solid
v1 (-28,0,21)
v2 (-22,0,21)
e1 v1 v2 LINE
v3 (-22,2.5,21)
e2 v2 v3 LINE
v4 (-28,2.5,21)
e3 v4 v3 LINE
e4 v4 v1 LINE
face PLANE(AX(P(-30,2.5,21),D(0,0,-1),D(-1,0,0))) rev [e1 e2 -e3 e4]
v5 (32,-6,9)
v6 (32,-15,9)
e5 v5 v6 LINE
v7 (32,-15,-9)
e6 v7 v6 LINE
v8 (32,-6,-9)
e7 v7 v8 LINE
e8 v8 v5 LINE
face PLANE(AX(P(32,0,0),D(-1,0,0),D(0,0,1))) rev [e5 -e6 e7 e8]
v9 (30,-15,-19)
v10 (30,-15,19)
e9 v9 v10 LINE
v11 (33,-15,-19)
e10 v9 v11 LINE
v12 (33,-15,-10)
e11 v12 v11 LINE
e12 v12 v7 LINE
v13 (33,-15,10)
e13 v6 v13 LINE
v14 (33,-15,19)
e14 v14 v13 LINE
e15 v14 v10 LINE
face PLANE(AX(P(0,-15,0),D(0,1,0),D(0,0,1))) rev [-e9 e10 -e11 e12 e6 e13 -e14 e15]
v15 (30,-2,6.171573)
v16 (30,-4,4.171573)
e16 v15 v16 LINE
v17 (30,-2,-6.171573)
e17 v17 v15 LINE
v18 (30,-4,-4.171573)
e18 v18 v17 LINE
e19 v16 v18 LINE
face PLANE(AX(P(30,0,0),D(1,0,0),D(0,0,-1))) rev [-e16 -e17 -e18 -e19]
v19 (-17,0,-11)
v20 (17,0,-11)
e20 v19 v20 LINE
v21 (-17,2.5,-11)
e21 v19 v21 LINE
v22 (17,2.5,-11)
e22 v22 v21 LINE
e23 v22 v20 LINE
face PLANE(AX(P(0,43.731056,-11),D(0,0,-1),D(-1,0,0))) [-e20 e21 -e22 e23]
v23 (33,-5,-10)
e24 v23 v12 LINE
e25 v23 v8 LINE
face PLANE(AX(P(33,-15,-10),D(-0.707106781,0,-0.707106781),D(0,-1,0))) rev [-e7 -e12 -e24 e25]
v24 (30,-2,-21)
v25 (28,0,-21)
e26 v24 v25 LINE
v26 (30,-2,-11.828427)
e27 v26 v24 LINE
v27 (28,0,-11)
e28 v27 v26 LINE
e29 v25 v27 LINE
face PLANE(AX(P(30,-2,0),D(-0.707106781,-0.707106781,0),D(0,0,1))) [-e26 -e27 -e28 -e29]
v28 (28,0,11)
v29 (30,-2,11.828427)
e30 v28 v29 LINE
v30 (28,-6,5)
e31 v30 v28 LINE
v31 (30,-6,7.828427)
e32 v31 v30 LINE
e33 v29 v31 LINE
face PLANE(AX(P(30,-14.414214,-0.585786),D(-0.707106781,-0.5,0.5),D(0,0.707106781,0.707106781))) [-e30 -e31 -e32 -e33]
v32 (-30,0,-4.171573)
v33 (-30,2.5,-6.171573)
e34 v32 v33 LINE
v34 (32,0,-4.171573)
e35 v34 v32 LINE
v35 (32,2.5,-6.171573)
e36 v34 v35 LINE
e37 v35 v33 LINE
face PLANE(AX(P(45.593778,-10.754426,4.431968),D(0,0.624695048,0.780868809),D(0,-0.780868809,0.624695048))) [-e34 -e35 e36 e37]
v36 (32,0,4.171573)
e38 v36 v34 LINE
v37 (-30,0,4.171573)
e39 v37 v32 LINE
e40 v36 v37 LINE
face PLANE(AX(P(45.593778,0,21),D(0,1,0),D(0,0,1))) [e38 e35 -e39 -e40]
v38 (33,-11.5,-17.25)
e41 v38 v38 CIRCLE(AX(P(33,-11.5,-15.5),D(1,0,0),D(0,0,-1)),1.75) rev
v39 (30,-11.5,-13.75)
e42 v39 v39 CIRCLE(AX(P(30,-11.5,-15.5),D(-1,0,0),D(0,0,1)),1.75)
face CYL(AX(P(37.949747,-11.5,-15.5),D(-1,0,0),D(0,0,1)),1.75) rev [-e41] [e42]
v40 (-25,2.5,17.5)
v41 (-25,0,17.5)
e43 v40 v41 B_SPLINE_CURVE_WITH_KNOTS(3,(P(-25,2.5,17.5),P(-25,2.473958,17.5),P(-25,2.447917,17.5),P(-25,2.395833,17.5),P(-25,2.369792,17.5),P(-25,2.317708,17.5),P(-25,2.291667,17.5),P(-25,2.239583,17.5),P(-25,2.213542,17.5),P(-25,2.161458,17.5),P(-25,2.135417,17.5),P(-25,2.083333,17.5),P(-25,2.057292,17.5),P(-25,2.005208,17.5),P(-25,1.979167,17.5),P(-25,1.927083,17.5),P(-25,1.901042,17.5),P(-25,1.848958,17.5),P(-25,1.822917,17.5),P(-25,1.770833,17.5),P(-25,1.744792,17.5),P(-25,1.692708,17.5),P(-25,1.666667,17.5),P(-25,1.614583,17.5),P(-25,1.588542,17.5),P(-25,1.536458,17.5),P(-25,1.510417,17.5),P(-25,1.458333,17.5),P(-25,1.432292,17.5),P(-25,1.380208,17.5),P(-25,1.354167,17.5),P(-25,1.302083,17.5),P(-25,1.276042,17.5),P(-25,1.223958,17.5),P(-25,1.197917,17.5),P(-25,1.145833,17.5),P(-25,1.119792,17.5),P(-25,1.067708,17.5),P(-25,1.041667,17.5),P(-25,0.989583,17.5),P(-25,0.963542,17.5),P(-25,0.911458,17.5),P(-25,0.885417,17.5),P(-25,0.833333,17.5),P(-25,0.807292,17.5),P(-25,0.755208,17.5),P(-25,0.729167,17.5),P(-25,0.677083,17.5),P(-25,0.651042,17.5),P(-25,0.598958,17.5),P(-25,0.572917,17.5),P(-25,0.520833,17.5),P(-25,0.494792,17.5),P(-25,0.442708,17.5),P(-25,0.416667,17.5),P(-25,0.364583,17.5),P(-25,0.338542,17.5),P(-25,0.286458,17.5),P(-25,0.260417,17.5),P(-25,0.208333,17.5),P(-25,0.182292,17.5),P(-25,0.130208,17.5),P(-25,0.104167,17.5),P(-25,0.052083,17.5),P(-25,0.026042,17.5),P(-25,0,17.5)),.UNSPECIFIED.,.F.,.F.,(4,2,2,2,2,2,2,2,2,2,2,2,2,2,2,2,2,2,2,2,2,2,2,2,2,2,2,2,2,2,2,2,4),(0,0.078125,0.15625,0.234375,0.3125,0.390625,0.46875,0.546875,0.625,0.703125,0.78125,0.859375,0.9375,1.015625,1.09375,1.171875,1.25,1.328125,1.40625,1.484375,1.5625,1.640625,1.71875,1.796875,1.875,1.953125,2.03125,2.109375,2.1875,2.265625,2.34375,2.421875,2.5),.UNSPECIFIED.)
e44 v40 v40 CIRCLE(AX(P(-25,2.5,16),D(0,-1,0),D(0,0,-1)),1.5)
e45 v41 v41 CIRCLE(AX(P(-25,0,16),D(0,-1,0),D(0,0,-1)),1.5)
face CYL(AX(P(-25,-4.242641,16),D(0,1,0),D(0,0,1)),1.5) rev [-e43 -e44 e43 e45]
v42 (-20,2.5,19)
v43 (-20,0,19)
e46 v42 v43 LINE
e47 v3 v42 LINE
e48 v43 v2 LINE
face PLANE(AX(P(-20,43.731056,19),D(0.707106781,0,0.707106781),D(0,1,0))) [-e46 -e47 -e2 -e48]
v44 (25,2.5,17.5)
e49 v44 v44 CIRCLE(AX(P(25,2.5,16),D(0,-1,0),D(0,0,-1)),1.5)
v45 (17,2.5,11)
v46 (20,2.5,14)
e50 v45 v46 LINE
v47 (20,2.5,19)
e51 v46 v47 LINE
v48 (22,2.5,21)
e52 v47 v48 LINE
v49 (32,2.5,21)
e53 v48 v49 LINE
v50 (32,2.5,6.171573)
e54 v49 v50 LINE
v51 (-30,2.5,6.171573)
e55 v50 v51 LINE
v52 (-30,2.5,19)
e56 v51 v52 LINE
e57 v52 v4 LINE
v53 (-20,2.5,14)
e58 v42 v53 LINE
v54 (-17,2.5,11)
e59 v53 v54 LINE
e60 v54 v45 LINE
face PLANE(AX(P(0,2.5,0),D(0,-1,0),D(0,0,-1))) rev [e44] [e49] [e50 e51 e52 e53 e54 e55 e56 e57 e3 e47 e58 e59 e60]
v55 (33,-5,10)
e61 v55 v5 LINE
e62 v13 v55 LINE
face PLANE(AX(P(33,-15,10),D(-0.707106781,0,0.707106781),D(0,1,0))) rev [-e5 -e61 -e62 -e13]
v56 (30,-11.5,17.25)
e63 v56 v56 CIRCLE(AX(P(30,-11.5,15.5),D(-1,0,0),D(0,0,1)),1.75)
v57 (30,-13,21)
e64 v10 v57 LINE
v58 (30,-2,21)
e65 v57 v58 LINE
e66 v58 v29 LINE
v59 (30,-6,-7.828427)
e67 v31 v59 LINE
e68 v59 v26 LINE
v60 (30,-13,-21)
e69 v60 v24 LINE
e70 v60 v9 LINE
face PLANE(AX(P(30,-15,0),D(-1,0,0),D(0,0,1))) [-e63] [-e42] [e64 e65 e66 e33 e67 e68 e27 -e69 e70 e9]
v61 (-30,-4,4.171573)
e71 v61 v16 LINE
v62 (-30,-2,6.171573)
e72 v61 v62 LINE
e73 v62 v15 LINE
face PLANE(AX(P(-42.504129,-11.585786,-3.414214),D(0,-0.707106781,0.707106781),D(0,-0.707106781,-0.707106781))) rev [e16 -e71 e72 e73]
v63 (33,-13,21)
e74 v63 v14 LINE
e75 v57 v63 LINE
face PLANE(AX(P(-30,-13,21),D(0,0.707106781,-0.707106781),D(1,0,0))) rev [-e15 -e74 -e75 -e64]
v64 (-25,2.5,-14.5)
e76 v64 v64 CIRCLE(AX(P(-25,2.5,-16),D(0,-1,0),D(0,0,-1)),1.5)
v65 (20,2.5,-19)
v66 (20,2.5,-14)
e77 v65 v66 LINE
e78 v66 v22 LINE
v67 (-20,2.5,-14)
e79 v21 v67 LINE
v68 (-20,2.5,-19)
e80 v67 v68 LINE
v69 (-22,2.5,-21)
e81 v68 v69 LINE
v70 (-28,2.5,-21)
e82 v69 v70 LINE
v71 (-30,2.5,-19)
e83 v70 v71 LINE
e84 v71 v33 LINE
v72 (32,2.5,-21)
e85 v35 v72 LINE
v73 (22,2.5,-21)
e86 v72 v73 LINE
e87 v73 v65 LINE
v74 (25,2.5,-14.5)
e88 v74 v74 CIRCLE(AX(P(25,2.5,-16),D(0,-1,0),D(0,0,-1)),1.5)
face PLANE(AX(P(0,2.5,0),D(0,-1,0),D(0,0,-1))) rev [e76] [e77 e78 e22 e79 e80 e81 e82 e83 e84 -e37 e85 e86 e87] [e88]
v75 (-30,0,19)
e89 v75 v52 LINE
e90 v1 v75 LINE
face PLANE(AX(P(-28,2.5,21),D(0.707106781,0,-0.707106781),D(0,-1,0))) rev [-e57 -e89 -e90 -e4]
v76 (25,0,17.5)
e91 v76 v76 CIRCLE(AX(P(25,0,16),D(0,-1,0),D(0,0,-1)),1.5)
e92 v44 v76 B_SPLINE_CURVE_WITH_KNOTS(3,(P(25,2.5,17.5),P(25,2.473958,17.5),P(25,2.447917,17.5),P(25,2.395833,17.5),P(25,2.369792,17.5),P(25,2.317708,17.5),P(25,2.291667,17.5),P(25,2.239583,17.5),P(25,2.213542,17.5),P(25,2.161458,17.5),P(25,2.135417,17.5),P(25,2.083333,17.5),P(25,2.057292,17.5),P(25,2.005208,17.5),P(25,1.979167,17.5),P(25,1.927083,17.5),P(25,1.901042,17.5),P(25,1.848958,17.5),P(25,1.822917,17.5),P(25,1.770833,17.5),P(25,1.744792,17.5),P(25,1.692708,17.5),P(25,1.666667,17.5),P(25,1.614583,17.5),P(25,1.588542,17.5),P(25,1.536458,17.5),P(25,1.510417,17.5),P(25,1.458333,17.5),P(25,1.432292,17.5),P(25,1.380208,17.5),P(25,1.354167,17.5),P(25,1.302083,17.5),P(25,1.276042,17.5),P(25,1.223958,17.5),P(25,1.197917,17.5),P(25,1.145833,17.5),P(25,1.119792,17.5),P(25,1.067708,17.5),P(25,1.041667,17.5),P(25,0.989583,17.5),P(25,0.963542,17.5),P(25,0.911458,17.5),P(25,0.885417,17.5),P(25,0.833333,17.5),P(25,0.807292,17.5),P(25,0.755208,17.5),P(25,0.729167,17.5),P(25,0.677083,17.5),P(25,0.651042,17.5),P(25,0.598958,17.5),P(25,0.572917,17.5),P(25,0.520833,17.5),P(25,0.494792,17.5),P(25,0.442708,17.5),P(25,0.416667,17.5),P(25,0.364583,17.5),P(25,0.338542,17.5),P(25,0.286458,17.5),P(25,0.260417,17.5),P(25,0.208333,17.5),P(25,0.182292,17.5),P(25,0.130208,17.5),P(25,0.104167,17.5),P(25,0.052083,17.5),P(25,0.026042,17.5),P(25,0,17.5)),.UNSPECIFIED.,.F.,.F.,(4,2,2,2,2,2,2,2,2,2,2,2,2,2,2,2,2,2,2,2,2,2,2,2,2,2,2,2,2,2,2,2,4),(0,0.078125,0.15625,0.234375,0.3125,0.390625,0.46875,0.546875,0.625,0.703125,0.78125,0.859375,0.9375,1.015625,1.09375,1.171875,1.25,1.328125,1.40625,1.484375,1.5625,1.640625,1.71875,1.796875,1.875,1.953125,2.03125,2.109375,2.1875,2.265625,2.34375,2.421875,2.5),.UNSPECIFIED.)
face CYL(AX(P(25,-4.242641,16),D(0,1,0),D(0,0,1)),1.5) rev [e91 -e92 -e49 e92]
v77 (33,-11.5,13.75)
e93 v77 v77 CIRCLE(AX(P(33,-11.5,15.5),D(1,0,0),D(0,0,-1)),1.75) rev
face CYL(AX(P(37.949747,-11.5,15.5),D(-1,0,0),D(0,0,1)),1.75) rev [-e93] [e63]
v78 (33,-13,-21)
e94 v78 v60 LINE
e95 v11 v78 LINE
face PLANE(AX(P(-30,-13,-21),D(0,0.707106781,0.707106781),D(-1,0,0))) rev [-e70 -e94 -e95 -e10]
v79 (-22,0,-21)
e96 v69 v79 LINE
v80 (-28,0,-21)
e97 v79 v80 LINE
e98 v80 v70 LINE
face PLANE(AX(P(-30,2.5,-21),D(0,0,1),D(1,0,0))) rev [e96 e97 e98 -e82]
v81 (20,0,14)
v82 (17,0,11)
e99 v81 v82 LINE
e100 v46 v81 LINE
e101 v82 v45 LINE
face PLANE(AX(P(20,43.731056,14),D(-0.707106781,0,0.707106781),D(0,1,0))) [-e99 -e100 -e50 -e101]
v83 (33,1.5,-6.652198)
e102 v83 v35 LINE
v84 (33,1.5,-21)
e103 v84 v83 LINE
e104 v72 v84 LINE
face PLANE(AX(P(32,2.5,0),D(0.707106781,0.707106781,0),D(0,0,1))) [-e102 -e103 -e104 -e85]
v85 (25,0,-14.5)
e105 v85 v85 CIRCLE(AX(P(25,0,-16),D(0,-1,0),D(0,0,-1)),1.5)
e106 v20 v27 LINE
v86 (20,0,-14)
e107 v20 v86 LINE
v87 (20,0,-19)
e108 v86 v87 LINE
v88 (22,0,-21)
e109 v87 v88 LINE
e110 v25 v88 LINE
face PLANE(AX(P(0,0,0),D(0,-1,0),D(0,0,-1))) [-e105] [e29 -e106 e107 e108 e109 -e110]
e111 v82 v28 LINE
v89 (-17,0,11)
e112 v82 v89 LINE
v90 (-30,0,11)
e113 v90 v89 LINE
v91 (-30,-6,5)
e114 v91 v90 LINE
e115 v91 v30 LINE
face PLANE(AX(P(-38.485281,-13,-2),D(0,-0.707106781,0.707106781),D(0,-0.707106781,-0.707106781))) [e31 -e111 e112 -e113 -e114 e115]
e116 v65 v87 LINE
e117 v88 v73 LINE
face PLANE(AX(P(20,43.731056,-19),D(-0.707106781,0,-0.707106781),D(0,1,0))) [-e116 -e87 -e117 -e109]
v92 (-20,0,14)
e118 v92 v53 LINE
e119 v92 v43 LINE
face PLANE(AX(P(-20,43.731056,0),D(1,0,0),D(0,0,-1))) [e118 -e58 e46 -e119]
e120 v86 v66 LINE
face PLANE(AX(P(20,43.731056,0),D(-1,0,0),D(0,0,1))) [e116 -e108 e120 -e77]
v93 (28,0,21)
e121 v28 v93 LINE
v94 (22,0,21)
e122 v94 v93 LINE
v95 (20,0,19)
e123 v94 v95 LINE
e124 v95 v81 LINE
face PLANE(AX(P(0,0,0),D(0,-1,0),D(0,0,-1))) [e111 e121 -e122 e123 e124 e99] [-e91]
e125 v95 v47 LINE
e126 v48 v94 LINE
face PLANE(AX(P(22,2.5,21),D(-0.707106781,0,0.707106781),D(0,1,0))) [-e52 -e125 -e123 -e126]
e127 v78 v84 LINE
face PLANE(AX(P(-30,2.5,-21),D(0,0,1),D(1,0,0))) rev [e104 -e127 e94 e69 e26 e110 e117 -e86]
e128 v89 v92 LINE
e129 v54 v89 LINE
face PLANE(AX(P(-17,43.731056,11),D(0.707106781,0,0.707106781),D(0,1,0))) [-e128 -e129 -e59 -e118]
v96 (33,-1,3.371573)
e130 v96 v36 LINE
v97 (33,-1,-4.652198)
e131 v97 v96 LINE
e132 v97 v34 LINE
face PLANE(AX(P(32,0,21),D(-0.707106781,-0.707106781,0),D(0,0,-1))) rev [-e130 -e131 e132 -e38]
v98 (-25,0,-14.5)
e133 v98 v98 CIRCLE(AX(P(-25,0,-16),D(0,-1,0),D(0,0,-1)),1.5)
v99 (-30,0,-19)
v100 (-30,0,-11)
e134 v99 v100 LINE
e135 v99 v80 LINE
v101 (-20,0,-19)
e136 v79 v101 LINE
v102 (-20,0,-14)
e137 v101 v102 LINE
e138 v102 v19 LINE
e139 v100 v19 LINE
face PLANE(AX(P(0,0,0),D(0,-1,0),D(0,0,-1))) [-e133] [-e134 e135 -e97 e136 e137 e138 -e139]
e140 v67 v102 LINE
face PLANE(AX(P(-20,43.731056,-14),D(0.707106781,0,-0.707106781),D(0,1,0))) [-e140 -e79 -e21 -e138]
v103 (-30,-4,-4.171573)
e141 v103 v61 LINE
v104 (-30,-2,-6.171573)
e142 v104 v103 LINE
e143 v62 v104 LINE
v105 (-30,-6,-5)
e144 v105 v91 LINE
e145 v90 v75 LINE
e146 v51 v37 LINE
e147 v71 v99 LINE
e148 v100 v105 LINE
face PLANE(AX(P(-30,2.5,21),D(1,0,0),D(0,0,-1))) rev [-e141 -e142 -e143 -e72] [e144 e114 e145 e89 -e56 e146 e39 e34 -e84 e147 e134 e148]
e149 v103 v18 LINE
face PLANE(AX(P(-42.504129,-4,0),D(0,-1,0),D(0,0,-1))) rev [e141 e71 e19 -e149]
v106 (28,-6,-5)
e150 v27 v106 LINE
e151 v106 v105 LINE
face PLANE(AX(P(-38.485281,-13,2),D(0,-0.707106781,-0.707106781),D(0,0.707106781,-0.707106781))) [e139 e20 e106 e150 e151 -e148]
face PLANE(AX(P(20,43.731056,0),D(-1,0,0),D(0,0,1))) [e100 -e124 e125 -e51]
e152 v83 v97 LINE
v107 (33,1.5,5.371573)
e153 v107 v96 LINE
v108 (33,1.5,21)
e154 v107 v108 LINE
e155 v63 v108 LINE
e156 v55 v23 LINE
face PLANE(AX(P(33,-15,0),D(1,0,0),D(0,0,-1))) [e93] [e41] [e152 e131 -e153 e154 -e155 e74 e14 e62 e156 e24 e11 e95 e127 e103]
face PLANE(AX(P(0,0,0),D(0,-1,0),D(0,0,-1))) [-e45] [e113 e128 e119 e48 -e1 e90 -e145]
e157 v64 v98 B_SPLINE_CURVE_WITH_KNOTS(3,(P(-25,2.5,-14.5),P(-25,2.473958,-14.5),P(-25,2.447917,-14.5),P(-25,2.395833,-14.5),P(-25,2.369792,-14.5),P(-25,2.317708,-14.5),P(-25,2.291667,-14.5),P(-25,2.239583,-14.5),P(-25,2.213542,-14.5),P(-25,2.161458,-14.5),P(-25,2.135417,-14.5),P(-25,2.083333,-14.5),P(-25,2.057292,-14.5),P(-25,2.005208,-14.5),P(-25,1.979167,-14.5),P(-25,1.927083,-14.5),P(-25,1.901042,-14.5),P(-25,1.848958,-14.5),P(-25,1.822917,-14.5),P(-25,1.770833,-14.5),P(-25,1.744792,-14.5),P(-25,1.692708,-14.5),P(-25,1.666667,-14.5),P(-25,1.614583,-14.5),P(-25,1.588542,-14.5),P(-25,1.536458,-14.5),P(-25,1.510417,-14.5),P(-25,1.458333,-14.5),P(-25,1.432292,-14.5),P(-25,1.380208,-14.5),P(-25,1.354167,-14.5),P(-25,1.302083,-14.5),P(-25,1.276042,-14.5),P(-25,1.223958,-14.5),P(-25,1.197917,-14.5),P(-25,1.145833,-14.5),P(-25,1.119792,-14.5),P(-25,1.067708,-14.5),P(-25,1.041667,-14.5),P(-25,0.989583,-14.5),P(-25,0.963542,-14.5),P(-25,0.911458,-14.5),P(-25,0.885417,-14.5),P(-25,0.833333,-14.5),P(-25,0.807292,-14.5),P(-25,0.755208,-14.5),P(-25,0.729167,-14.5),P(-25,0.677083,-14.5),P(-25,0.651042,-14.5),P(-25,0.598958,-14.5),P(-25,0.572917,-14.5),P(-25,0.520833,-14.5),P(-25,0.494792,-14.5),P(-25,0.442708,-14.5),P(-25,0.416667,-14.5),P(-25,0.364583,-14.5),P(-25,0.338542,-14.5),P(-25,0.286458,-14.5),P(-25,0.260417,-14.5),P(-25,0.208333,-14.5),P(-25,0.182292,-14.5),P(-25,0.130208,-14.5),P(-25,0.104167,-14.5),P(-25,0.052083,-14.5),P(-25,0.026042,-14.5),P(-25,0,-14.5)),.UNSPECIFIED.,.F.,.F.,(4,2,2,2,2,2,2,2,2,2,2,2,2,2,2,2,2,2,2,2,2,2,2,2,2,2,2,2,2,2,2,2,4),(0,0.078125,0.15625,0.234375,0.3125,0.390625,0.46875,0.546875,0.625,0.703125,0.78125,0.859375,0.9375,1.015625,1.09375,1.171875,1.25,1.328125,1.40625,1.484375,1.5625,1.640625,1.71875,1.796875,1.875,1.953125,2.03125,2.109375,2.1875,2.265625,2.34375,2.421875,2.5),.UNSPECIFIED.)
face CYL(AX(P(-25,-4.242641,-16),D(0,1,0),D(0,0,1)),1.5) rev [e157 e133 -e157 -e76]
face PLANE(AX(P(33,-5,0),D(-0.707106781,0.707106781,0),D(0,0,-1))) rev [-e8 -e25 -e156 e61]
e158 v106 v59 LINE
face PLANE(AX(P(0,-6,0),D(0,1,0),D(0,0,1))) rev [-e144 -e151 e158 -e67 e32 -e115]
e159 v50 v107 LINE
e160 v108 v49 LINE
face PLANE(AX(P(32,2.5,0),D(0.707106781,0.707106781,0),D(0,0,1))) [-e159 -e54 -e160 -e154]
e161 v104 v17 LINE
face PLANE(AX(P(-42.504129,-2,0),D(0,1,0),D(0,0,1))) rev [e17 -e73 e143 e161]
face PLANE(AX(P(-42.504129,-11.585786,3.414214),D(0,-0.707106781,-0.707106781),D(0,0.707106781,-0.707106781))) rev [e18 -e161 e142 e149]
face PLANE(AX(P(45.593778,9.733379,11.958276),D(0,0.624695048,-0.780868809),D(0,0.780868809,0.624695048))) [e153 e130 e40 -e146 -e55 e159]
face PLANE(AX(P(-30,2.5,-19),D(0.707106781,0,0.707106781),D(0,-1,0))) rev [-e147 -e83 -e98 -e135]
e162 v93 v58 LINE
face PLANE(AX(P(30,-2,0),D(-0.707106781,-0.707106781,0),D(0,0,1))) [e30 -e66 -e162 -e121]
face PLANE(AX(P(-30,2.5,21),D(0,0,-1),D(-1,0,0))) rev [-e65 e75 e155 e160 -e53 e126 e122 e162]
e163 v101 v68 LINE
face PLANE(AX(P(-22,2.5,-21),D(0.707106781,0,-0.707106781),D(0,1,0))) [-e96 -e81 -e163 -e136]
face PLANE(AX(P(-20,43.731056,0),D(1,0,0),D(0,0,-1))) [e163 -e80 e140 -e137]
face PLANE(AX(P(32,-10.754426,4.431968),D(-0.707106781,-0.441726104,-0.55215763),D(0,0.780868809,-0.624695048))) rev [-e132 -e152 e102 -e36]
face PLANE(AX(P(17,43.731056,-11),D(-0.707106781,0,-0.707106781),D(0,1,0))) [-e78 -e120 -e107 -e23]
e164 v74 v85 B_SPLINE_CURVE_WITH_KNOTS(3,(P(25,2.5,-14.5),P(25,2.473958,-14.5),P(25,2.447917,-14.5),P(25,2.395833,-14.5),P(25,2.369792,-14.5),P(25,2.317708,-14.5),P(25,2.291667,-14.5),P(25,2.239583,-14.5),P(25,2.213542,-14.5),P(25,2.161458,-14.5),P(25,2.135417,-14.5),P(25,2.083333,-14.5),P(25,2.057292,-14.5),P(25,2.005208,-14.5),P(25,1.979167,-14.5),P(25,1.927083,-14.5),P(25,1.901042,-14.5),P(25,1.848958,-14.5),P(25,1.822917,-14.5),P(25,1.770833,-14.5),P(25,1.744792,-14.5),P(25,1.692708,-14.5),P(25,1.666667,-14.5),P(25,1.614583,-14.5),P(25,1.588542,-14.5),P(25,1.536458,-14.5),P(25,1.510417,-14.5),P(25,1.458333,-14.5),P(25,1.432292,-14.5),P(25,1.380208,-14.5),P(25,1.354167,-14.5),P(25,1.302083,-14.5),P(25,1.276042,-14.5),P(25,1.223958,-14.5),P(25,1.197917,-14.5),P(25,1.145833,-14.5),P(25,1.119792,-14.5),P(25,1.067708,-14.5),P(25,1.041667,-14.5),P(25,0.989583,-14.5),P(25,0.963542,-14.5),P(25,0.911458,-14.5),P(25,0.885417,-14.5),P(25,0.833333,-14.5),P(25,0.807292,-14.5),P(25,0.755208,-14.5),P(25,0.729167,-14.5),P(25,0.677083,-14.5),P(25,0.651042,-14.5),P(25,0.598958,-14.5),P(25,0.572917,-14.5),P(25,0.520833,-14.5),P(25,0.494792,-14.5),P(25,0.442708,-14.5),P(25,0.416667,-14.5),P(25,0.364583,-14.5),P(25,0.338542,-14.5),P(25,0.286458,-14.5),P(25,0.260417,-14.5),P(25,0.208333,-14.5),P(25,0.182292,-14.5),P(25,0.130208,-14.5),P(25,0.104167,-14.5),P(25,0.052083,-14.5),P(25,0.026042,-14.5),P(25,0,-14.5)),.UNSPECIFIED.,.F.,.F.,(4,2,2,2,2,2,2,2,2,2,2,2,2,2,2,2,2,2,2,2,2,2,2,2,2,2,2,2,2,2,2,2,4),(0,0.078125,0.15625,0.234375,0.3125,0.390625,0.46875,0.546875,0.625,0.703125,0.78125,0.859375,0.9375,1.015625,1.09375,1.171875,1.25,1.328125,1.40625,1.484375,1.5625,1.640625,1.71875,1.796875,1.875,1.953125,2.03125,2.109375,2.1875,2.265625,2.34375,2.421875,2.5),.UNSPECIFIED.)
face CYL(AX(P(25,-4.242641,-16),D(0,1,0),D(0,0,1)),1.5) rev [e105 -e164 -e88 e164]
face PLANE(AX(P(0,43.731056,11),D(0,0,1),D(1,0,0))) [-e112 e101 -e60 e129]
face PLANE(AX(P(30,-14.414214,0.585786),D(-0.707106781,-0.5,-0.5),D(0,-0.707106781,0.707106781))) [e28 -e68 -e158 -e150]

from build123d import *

# Parameters (mm, degrees)
SKETCH_2_W          = 60
SKETCH_2_H          = 42
EXTRUDE_1_DEPTH     = 2.5
CUT_EXTRUDE_START   = 2.5
SKETCH_3_R          = 1.5
CUT_EXTRUDE_1_DEPTH = 2.5
SKETCH_6_W          = 40
SKETCH_6_H          = 10
CUT_EXTRUDE_2_DEPTH = 2.5
SKETCH_7_W          = 60
SKETCH_7_H          = 10
EXTRUDE_3_DEPTH     = 6
EXTRUDE_START       = 2.5
SKETCH_9_W          = 3
SKETCH_9_H          = 42
EXTRUDE_4_DEPTH     = 17.5
EXTRUDE_START_2     = 30
EXTRUDE_5_DEPTH     = 60
CUT_EXTRUDE_START_2 = 30
SKETCH_16_R         = 1.75
CUT_EXTRUDE_3_DEPTH = 3
CUT_EXTRUDE_START_3 = -30
CUT_EXTRUDE_4_DEPTH = 60
CHAMFER_1_SIZE      = 2
CUT_EXTRUDE_6_DEPTH = 63
CHAMFER_2_SIZE      = 2
CUT_EXTRUDE_START_4 = 33
SKETCH_21_W         = 20
SKETCH_21_H         = 10
CUT_EXTRUDE_7_DEPTH = 1
CHAMFER_3_SIZE      = 1
CHAMFER_4_SIZE      = 3


with BuildPart() as part:
    # 草图2 → 凸台-拉伸1 (new body)
    with BuildSketch(Plane(origin=(0, 0, 0), x_dir=(1, 0, 0), z_dir=(0, 1, 0))):
        Rectangle(SKETCH_2_W, SKETCH_2_H)
    extrude(amount=EXTRUDE_1_DEPTH)

    # 草图3 → 切除-拉伸1 (cut)
    with BuildSketch(Plane(origin=(0, 0, 0), x_dir=(1, 0, 0), z_dir=(0, 1, 0)).offset(CUT_EXTRUDE_START)):
        with Locations(Location((-25, 16, 0), (0, 0, 270))):
            Circle(SKETCH_3_R)
        with Locations(Location((25, 16, 0), (0, 0, 270))):
            Circle(SKETCH_3_R)
        with Locations(Location((-25, -16, 0), (0, 0, 270))):
            Circle(SKETCH_3_R)
        with Locations(Location((25, -16, 0), (0, 0, 270))):
            Circle(SKETCH_3_R)
    extrude(amount=-CUT_EXTRUDE_1_DEPTH, mode=Mode.SUBTRACT)

    # 草图6 → 切除-拉伸2 (cut)
    with BuildSketch(Plane(origin=(0, 0, 0), x_dir=(1, 0, 0), z_dir=(0, 1, 0))):
        with Locations((0, 16)):
            Rectangle(SKETCH_6_W, SKETCH_6_H)
        with Locations((0, -16)):
            Rectangle(SKETCH_6_W, SKETCH_6_H)
    extrude(amount=CUT_EXTRUDE_2_DEPTH, mode=Mode.SUBTRACT)

    # 草图7 → 凸台-拉伸3 (add)
    with BuildSketch(Plane(origin=(0, 0, 0), x_dir=(1, 0, 0), z_dir=(0, 1, 0))):
        Rectangle(SKETCH_7_W, SKETCH_7_H)
    extrude(amount=-EXTRUDE_3_DEPTH)

    # 草图9 → 凸台-拉伸4 (add)
    with BuildSketch(Plane(origin=(0, 0, 0), x_dir=(1, 0, 0), z_dir=(0, 1, 0)).offset(EXTRUDE_START)):
        with Locations((31.5, 0)):
            Rectangle(SKETCH_9_W, SKETCH_9_H)
    extrude(amount=-EXTRUDE_4_DEPTH)

    # 草图11 → 凸台-拉伸5 (add)
    with BuildSketch(Plane(origin=(0, 0, 0), x_dir=(0, 0, -1), z_dir=(1, 0, 0)).offset(EXTRUDE_START_2)):
        Polygon((5, -6), (11, 0), (5, 0), align=None)
        Polygon((-5, -6), (-5, 0), (-11, 0), align=None)
    extrude(amount=-EXTRUDE_5_DEPTH)

    # 草图16 → 切除-拉伸3 (cut)
    with BuildSketch(Plane(origin=(0, 0, 0), x_dir=(0, 0, -1), z_dir=(1, 0, 0)).offset(CUT_EXTRUDE_START_2)):
        with Locations(Location((-15.5, -11.5, 0), (0, 0, 180))):
            Circle(SKETCH_16_R)
        with Locations(Location((15.5, -11.5, 0), (0, 0, 180))):
            Circle(SKETCH_16_R)
    extrude(amount=CUT_EXTRUDE_3_DEPTH, mode=Mode.SUBTRACT)

    # 草图18 → 切除-拉伸4 (cut)
    with BuildSketch(Plane(origin=(0, 0, 0), x_dir=(0, 0, -1), z_dir=(1, 0, 0)).offset(CUT_EXTRUDE_START_3)):
        Polygon((6.171572875, -2), (4.171572875, -4), (-4.171572875, -4), (-6.171572875, -2), align=None)
    extrude(amount=CUT_EXTRUDE_4_DEPTH, mode=Mode.SUBTRACT)

    # 倒角1
    chamfer_1_edges = [part.edges().sort_by_distance(p)[0] for p in [
        (30, 0, -16),
        (30, -3, -8),
        (30, -3, 8),
        (30, 0, 16),
    ]]
    chamfer(chamfer_1_edges, length=CHAMFER_1_SIZE)

    # 草图19 → 切除-拉伸6 (cut)
    with BuildSketch(Plane(origin=(0, 0, 0), x_dir=(0, 0, -1), z_dir=(1, 0, 0)).offset(CUT_EXTRUDE_START_3)):
        Polygon((6.171572875, 2.5), (4.171572875, 0), (-4.171572875, 0), (-6.171572875, 2.5), align=None)
    extrude(amount=CUT_EXTRUDE_6_DEPTH, mode=Mode.SUBTRACT)

    # 倒角2
    chamfer_2_edges = [part.edges().sort_by_distance(p)[0] for p in [
        (20, 1.25, 21),
        (-20, 1.25, 21),
        (-20, 1.25, -21),
        (20, 1.25, -21),
        (-30, 1.25, 21),
        (-30, 1.25, -21),
        (31.5, -15, -21),
        (31.5, -15, 21),
    ]]
    chamfer(chamfer_2_edges, length=CHAMFER_2_SIZE)

    # 草图21 → 切除-拉伸7 (cut)
    with BuildSketch(Plane(origin=(0, 0, 0), x_dir=(0, 0, -1), z_dir=(1, 0, 0)).offset(CUT_EXTRUDE_START_4)):
        with Locations((0, -10)):
            Rectangle(SKETCH_21_W, SKETCH_21_H)
    extrude(amount=-CUT_EXTRUDE_7_DEPTH, mode=Mode.SUBTRACT)

    # 倒角3
    chamfer_3_edges = [part.edges().sort_by_distance(p)[0] for p in [
        (33, 2.5, 13.585786438),
        (33, 0, 0),
        (33, 1.25, -5.171572875),
        (33, 2.5, -13.585786438),
        (32, -10, -10),
        (32, -10, 10),
        (32, -5, 0),
    ]]
    chamfer(chamfer_3_edges, length=CHAMFER_3_SIZE - 0.0001)  # a hair under: the kernel refuses the full size

    # 倒角4
    chamfer_4_edges = [part.edges().sort_by_distance(p)[0] for p in [
        (-20, 1.25, 11),
        (20, 1.25, 11),
        (20, 1.25, -11),
        (-20, 1.25, -11),
    ]]
    chamfer(chamfer_4_edges, length=CHAMFER_4_SIZE)


solid = part.part
